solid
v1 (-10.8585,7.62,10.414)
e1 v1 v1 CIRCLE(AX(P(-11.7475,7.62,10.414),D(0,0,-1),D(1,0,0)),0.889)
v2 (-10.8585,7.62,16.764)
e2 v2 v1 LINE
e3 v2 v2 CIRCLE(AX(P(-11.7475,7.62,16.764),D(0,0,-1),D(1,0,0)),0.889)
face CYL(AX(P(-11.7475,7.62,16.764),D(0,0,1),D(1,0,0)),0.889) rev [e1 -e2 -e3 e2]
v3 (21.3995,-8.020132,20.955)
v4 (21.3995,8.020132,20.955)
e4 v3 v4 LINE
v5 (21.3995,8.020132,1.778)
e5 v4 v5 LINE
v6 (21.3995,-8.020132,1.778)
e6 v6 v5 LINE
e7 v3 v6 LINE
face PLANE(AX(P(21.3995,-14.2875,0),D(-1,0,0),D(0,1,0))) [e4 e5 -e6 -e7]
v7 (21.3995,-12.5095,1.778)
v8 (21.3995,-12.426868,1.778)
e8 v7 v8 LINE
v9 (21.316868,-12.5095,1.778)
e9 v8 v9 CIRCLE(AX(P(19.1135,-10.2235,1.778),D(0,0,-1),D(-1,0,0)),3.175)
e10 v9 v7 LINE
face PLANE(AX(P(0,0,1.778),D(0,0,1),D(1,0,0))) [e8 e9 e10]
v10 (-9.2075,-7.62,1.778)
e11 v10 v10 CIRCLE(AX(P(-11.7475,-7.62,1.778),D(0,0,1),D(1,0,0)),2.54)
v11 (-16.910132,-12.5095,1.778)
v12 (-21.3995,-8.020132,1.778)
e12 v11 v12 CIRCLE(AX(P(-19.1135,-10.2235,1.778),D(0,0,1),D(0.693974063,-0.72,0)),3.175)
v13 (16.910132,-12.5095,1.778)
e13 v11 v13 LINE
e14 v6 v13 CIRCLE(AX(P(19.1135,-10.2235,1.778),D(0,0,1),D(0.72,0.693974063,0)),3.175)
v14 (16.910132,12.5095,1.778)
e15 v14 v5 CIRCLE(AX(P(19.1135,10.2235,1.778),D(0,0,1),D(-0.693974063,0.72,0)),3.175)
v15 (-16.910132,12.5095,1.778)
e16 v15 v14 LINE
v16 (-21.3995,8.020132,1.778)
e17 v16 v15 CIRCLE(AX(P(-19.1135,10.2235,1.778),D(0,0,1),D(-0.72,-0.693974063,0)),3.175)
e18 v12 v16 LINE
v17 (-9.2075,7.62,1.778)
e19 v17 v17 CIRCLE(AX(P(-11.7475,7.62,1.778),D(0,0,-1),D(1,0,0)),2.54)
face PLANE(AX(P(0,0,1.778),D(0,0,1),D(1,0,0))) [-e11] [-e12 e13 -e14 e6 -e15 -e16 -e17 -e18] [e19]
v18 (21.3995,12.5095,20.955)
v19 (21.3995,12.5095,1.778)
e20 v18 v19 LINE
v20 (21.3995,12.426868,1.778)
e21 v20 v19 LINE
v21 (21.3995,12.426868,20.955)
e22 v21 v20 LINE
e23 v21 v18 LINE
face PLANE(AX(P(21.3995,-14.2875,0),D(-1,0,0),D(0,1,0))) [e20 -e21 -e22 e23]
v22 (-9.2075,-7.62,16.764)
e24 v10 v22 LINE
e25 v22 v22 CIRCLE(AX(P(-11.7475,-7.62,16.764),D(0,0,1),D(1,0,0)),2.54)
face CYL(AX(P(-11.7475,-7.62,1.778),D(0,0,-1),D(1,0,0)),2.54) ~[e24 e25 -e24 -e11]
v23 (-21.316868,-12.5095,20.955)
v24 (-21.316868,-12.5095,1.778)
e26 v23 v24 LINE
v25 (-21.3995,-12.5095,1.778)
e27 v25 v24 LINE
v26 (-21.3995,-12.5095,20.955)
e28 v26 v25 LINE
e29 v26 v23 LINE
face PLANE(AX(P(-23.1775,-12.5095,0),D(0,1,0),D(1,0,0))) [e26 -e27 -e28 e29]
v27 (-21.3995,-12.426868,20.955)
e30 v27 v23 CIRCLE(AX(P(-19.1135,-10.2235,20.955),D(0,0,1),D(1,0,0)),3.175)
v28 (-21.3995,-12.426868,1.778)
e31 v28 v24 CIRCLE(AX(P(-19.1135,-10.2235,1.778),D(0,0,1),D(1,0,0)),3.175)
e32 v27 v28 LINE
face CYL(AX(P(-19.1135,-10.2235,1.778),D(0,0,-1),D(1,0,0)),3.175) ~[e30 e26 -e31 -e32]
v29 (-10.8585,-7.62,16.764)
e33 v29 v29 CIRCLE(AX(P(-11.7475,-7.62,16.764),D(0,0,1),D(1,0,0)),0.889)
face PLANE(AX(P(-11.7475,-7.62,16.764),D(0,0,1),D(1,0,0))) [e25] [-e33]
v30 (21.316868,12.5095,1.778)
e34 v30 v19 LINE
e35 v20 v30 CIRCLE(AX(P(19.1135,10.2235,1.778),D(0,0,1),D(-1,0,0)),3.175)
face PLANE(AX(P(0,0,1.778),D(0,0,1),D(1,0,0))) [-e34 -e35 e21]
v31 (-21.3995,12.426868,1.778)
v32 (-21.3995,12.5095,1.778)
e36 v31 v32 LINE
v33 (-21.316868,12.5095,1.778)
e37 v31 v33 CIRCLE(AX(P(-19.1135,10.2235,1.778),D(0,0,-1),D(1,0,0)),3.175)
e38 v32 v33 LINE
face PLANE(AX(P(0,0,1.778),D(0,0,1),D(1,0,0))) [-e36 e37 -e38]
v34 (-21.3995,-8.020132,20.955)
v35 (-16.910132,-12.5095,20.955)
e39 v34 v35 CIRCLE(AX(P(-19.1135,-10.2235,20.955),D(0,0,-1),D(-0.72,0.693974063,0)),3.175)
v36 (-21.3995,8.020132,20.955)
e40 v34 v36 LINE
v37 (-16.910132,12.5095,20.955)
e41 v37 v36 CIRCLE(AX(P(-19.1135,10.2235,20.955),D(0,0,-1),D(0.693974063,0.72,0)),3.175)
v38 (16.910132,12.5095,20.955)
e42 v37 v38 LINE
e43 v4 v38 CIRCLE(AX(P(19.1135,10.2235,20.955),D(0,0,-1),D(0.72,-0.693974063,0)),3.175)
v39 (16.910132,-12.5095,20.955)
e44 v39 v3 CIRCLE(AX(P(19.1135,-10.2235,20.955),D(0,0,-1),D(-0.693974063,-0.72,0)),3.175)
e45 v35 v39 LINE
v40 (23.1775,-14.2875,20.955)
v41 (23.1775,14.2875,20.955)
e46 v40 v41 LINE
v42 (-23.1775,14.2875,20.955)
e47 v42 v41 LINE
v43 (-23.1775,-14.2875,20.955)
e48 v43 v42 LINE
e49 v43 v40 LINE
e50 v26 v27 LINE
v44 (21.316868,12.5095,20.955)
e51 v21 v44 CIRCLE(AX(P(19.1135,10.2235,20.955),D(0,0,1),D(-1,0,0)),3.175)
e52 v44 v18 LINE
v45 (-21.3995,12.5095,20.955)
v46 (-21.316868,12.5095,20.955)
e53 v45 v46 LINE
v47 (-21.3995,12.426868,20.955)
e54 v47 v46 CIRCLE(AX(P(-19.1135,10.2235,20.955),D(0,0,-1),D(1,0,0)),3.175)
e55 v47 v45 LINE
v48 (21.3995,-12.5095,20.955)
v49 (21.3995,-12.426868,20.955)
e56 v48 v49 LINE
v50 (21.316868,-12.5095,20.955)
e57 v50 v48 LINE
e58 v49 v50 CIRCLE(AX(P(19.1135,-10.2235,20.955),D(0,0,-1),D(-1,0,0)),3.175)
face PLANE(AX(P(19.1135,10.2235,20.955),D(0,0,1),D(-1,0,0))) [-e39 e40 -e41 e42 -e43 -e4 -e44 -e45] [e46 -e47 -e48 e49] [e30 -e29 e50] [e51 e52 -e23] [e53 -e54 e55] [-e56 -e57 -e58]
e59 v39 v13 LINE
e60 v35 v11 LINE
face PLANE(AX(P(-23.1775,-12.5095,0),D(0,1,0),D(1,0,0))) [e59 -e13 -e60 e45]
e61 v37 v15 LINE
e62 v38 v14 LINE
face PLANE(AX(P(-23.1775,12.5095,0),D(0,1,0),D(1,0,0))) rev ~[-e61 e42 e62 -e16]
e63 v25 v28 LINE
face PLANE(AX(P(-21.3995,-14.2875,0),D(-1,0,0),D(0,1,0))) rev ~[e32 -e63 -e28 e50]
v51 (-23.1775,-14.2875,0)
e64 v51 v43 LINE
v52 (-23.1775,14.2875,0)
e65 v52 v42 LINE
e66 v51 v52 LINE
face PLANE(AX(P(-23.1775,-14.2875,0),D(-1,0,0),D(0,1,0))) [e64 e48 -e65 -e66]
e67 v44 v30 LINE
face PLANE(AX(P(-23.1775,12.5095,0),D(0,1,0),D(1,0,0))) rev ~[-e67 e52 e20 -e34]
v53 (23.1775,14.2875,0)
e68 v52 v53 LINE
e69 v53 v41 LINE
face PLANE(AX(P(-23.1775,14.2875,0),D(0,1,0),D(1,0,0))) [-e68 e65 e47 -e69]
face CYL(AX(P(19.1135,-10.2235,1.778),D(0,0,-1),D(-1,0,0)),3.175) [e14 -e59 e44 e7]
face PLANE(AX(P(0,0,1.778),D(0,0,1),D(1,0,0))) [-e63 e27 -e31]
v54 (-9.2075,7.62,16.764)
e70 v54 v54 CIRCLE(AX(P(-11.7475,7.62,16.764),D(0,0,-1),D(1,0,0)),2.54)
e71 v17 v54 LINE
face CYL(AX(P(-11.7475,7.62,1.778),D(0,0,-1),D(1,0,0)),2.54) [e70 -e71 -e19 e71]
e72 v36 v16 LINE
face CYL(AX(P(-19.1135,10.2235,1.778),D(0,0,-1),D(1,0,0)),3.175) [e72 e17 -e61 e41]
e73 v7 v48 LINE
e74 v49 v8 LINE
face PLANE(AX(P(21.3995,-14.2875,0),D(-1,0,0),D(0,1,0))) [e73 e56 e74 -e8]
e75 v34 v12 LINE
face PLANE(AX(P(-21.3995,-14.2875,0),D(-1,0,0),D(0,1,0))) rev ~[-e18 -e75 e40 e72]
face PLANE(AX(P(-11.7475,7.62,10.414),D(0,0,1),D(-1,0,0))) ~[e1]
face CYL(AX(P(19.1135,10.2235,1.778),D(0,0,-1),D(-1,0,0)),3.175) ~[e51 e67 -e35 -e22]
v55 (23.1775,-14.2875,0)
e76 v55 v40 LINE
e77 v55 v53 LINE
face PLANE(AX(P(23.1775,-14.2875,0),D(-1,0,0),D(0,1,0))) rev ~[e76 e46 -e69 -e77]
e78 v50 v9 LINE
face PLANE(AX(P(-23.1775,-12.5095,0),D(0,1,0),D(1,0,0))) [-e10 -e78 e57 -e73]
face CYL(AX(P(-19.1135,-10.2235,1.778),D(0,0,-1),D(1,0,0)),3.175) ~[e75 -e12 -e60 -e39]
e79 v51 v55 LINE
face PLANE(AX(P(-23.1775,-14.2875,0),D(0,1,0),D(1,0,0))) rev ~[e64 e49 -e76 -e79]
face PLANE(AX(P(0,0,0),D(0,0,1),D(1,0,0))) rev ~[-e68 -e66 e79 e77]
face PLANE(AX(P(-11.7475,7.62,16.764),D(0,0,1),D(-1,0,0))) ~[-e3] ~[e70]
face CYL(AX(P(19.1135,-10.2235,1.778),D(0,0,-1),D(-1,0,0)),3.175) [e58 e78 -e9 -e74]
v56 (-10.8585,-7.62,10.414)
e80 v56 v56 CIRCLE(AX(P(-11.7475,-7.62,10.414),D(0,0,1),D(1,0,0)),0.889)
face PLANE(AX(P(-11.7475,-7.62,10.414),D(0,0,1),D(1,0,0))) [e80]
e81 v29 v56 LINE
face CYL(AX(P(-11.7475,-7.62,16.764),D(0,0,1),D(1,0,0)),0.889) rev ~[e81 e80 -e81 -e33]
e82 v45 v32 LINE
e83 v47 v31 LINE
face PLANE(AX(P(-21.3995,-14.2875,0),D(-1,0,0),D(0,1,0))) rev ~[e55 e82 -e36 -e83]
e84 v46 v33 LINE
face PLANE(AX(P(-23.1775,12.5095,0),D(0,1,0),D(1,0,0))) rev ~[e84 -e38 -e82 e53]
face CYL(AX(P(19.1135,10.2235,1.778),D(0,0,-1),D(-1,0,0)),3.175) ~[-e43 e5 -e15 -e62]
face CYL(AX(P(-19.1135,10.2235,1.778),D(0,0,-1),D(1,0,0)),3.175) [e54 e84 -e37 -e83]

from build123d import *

# Parameters (mm, degrees)
F0_W             = 46.355
F0_H             = 28.575
F1_DEPTH         = 20.955
F2_T             = -1.778
F3_R             = 2.54
F4_DEPTH         = 14.986
F5_R             = 0.889
F6_DEPTH         = 6.35
F7_R             = 3.175
F8_DEPTH         = 19.177
F8_COPIES2_COUNT = 2


# Not quite as in the source:
# - a pattern or mirror of a feature is missing from the dataset's text; its kind, count and spacing are read off the source's solid


with BuildPart() as f1:
    # F0 (on Top) → F1 (new body)
    with BuildSketch(Plane.XY):
        Rectangle(F0_W, F0_H)
    extrude(amount=F1_DEPTH)

    # F2
    f2_openings = [f1.faces().sort_by_distance(p)[0] for p in [
        (0, 0, 20.955),
    ]]
    offset(amount=F2_T, openings=f2_openings)

    # F3 (on face) → F4 (join)
    with BuildSketch(Plane.XY.offset(1.778)):
        with Locations((-11.7475, -7.62)):
            Circle(F3_R)
    f4 = extrude(amount=F4_DEPTH)

    # F4_copies: F4 across plane
    add(f4.mirror(Plane.ZX))

    # F5 (on face) → F6 (cut)
    with BuildSketch(Plane.XY.offset(16.764)):
        with Locations((-11.7475, -7.62)):
            Circle(F5_R)
    f6 = extrude(amount=-F6_DEPTH, mode=Mode.SUBTRACT)

    # F6_copies: F6 across plane
    add(f6.mirror(Plane.ZX), mode=Mode.SUBTRACT)

    # F7 (on face) → F8 (join, through all)
    with BuildSketch(Plane.XY.offset(1.778)):
        with Locations((-19.1135, -10.2235)):
            Circle(F7_R)
    f8 = extrude(amount=F8_DEPTH)

    # F8_copies: F8 across plane
    add(f8.mirror(Plane.ZX))

    # F8_copies1: F8 across plane
    add(f8.mirror(Plane(origin=(0, 0, 0), x_dir=(0, 0, 1), z_dir=(1, 0, 0))))

    # F8_copies2: F8 ×2 about axis
    f8_copies2_axis = Axis((0, 0, 0), (0, 0, 1))
    for i in range(1, F8_COPIES2_COUNT):
        add(f8.rotate(f8_copies2_axis, i * 360 / F8_COPIES2_COUNT))


solid = f1.part
